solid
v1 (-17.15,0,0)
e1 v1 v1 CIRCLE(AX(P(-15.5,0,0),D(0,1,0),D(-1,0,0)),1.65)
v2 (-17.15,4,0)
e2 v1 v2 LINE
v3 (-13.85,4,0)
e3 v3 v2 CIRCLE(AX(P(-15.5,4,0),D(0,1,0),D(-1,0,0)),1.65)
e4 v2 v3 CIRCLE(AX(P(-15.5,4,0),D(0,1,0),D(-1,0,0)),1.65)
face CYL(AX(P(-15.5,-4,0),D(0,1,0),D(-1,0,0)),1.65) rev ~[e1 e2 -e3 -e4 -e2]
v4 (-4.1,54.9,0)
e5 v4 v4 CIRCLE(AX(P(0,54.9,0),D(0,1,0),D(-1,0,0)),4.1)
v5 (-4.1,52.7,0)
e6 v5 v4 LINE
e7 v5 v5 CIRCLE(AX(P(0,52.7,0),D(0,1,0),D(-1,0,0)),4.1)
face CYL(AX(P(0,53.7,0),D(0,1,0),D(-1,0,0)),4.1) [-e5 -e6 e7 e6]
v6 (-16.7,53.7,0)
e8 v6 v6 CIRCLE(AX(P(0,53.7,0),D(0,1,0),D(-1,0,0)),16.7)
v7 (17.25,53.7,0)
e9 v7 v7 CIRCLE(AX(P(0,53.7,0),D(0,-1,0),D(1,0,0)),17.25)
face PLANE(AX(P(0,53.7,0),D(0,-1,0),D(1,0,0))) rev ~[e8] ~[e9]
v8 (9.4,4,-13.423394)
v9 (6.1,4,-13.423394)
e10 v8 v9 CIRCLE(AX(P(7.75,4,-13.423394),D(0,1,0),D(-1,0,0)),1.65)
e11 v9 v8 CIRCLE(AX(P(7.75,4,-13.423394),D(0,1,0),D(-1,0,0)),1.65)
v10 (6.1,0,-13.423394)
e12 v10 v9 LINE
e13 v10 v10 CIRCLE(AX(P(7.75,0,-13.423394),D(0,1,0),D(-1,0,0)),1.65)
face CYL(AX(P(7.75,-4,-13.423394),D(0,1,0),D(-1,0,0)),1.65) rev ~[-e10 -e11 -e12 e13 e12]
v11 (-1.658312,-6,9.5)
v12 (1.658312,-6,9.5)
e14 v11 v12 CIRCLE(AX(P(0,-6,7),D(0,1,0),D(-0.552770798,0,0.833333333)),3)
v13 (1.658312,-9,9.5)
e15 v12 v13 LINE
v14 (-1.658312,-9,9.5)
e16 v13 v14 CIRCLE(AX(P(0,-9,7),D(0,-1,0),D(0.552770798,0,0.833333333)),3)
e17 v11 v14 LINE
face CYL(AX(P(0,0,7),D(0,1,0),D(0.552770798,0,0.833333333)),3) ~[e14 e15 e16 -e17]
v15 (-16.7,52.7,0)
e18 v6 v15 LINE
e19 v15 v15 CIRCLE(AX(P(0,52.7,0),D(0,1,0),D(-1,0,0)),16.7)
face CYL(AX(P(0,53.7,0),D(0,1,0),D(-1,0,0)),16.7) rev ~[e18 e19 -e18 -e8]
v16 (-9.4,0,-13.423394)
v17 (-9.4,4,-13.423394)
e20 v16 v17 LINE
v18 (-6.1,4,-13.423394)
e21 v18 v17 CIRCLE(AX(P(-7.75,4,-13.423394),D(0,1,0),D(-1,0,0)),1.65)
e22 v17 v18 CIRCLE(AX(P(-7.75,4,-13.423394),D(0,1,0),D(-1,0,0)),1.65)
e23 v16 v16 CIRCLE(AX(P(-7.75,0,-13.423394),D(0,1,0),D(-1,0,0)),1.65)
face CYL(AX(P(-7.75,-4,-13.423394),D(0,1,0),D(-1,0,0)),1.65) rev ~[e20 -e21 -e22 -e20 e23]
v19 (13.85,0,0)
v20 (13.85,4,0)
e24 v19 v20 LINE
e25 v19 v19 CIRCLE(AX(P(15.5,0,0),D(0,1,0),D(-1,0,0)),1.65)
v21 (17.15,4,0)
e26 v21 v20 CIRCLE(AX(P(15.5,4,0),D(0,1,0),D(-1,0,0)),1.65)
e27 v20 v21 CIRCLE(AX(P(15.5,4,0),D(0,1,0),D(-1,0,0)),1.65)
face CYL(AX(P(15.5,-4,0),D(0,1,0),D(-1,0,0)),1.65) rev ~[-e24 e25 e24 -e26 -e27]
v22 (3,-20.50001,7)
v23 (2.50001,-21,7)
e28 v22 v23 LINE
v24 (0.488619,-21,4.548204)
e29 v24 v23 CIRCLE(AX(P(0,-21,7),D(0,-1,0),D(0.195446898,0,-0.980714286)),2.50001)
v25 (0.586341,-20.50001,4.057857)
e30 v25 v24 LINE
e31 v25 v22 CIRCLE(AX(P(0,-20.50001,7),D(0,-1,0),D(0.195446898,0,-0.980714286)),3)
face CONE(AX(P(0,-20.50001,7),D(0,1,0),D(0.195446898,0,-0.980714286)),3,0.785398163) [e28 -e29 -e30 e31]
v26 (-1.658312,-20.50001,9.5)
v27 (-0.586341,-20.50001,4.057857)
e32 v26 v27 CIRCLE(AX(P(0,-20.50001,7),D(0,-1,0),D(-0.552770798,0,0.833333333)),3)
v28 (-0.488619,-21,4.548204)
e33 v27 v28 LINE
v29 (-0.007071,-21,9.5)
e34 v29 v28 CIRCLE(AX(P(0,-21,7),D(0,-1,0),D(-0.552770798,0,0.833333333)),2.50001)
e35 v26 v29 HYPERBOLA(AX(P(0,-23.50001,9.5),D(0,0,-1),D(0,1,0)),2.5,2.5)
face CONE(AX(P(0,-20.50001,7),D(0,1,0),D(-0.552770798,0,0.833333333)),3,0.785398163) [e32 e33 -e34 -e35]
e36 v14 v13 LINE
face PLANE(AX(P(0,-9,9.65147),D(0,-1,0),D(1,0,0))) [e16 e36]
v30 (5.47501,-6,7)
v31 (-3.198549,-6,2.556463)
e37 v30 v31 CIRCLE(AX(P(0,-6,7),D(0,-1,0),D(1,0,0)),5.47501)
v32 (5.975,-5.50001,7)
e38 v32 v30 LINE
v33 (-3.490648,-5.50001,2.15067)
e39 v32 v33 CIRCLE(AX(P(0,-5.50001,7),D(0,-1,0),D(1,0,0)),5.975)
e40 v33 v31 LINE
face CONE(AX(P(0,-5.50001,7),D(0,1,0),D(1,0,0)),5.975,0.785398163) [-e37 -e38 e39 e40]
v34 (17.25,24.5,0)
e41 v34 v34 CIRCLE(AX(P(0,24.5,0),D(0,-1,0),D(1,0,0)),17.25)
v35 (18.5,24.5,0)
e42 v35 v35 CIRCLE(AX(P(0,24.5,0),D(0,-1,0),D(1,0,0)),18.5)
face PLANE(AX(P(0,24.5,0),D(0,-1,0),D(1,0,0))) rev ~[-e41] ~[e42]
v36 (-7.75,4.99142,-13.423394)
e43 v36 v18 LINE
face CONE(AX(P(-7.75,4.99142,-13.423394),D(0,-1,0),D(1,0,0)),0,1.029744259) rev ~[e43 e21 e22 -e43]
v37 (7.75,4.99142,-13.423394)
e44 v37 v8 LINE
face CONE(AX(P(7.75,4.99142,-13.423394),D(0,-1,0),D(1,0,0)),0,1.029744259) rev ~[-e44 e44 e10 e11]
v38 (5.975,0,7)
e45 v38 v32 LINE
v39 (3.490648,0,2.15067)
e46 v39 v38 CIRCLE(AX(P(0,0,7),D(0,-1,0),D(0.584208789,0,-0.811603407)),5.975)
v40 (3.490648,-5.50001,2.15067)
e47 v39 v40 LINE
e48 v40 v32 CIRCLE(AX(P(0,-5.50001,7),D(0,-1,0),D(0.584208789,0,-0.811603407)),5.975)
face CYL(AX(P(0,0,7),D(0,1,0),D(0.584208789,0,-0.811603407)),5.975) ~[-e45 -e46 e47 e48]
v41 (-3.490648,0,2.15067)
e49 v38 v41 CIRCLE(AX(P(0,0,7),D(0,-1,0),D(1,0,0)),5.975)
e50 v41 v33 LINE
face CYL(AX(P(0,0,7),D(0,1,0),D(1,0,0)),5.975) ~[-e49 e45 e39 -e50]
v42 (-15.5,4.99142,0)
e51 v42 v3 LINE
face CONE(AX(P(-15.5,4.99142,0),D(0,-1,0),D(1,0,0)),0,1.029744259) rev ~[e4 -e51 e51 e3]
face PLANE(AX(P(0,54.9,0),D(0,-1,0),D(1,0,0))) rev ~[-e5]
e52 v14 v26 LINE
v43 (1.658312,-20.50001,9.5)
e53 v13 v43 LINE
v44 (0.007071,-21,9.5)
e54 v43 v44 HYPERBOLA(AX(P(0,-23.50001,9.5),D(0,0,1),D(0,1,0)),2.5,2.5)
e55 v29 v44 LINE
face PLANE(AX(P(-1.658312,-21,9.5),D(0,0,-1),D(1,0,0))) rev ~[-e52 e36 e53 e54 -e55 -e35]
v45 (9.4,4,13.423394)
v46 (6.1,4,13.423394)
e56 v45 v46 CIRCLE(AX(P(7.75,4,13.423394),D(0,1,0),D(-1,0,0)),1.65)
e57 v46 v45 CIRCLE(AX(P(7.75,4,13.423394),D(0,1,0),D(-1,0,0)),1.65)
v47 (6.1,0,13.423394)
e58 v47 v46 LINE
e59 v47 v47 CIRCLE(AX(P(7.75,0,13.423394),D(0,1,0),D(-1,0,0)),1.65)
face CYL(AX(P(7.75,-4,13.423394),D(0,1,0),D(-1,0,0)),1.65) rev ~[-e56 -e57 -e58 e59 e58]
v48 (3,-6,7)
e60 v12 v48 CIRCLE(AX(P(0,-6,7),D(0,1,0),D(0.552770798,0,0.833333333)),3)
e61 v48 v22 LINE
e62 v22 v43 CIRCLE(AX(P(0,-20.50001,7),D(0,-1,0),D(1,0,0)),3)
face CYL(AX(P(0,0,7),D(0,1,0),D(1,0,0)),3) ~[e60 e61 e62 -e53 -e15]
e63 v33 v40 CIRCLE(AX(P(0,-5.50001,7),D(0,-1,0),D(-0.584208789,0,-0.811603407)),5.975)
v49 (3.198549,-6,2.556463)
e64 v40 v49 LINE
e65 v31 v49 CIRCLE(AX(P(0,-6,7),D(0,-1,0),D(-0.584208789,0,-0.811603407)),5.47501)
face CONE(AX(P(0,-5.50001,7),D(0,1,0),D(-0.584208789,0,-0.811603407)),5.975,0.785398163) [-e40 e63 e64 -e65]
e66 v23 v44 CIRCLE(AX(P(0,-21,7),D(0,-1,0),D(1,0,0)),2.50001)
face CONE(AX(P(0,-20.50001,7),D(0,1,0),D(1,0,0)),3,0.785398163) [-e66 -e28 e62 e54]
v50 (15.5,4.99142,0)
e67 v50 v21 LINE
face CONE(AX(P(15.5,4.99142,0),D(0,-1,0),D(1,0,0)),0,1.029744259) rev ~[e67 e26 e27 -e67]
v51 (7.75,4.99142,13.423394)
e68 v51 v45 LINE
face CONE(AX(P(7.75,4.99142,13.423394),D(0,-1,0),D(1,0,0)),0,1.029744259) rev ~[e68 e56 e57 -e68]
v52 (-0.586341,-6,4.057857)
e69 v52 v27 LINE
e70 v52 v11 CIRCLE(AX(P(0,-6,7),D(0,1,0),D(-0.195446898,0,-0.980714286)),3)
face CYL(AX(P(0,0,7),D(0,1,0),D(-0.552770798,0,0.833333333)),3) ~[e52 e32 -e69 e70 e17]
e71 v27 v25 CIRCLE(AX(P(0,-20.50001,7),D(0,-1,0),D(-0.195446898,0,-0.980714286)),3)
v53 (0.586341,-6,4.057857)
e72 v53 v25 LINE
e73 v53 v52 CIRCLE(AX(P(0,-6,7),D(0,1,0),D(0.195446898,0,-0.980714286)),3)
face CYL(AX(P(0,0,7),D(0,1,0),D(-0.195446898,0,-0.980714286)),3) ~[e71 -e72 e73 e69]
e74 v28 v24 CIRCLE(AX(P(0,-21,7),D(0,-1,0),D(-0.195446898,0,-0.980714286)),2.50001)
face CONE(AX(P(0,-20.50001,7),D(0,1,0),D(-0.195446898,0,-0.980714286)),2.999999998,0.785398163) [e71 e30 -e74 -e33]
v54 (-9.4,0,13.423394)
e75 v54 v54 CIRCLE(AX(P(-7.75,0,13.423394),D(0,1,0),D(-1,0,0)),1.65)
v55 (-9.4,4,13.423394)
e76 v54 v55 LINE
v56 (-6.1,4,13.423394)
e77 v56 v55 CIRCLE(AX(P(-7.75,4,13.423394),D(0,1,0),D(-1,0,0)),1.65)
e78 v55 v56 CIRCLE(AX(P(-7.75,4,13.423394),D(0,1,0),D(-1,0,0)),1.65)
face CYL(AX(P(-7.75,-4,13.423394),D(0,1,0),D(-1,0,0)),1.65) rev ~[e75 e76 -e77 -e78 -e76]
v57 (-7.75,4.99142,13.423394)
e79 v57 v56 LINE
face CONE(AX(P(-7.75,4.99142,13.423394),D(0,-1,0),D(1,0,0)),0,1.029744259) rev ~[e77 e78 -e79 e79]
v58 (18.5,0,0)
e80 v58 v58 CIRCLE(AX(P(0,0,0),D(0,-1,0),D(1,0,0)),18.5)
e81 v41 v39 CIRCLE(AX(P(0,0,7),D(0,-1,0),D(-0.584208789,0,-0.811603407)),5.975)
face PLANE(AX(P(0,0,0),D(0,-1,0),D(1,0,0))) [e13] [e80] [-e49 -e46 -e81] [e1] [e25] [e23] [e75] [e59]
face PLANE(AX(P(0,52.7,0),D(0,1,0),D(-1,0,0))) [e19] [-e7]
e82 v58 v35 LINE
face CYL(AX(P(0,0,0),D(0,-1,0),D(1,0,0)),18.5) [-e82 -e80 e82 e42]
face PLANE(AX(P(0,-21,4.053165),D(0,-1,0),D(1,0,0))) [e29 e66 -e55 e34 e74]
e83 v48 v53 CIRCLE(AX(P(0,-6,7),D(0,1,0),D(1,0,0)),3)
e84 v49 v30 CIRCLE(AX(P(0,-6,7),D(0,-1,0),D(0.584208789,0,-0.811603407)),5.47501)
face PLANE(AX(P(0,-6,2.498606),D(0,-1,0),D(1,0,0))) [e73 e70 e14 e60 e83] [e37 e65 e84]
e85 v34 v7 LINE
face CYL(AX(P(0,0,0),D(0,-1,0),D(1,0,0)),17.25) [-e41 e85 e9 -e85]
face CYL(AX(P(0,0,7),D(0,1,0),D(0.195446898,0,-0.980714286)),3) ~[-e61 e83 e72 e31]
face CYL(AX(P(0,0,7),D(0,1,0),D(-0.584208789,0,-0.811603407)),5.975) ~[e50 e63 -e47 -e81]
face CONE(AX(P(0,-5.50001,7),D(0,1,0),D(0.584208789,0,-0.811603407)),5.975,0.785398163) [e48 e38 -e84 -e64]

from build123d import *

# Parameters (mm, degrees)
F0_R      = 18.5
F0_R_2    = 17.25
F0_R_3    = 16.7
F0_R_4    = 4.1
F1_DEPTH  = 24.5
F2_DEPTH  = 53.7
F3_R      = 16.7
F3_R_2    = 4.1
F4_DEPTH  = 1
F5_DEPTH  = 1.2
F7_D      = 3.3
F7_DEPTH  = 4
F7_TIP    = 0.9914200214
F8_DEPTH  = 21
F9_DEPTH  = 6
F11_DEPTH = 12
F13_SIZE  = 0.49999


# Not quite as in the source:
# - a fillet or chamfer is up to 0.001 mm smaller than in the source, because OpenCascade refuses the exact size
# - a feature of the source that left no trace in its solid (it failed there, or was rolled back) is left out
# - a feature names something its author has since deleted; it is built from what else it names


with BuildPart() as f1:
    # F0 (on Front) → F1 (new body)
    with BuildSketch(Plane.XZ):
        Circle(F0_R)
        Circle(F0_R_2, mode=Mode.SUBTRACT)
        Circle(F0_R_2)
        Circle(F0_R_3, mode=Mode.SUBTRACT)
        Circle(F0_R_3)
        Circle(F0_R_4, mode=Mode.SUBTRACT)
        Circle(F0_R_4)
    extrude(amount=-F1_DEPTH)

    # F0 (on Front) → F2 (join)
    with BuildSketch(Plane.XZ):
        Circle(F0_R_2)
        Circle(F0_R_3, mode=Mode.SUBTRACT)
        Circle(F0_R_3)
        Circle(F0_R_4, mode=Mode.SUBTRACT)
        Circle(F0_R_4)
    extrude(amount=-F2_DEPTH)

    # F3 (on face) → F4 (cut)
    with BuildSketch(Plane(origin=(0, 53.7, 0), x_dir=(-1, 0, 0), z_dir=(0, 1, 0))):
        Circle(F3_R)
        Circle(F3_R_2, mode=Mode.SUBTRACT)
    extrude(amount=-F4_DEPTH, mode=Mode.SUBTRACT)

    # F5 (add): a face of the model
    f5_faces = [f1.faces().sort_by_distance(p)[0] for p in [
        (0, 53.7, 0),
    ]]
    extrude(f5_faces, amount=F5_DEPTH)

    # F7
    with Locations(Plane.XZ):
        with Locations((7.75, 13.4233937587), (15.5, 0), (7.75, -13.4233937587), (-7.75, -13.4233937587), (-15.5, 0), (-7.75, 13.4233937587)):
            Hole(F7_D / 2, depth=F7_DEPTH)
            with Locations((0, 0, -(F7_DEPTH + F7_TIP / 2))):  # 118° drill point
                Cone(0, F7_D / 2, F7_TIP, mode=Mode.SUBTRACT)

    # F6 (on face) → F8 (join)
    with BuildSketch(Plane.XZ):
        with BuildLine():
            ThreePointArc((0.5863406929, 4.0578571429), (0, 4.1), (-0.5863406929, 4.0578571429))
            ThreePointArc((-0.5863406929, 4.0578571429), (0, 4), (0.5863406929, 4.0578571429))
        make_face()
        with BuildLine():
            ThreePointArc((-1.6583123952, 9.5), (-2.9434412837, 6.4202126173), (-0.5863406929, 4.0578571429))
            ThreePointArc((-0.5863406929, 4.0578571429), (0, 4.1), (0.5863406929, 4.0578571429))
            ThreePointArc((0.5863406929, 4.0578571429), (2.3193772956, 5.0972417493), (3, 7))
            ThreePointArc((3, 7), (2.6433820369, 8.4186371655), (1.6583123952, 9.5))
            Line((1.6583123952, 9.5), (-1.6583123952, 9.5))
        make_face()
        with BuildLine():
            ThreePointArc((1.6583123952, 9.5), (0, 10), (-1.6583123952, 9.5))
            Line((-1.6583123952, 9.5), (1.6583123952, 9.5))
        make_face()
    extrude(amount=F8_DEPTH)

    # F6 (on face) → F9 (join)
    with BuildSketch(Plane.XZ):
        with BuildLine():
            ThreePointArc((-0.5863406929, 4.0578571429), (-2.2505108877, 3.4271271853), (-3.4906475169, 2.1506696429))
            ThreePointArc((-3.4906475169, 2.1506696429), (0, 1.025), (3.4906475169, 2.1506696429))
            ThreePointArc((3.4906475169, 2.1506696429), (2.2505108877, 3.4271271853), (0.5863406929, 4.0578571429))
            ThreePointArc((0.5863406929, 4.0578571429), (0, 4), (-0.5863406929, 4.0578571429))
        make_face()
        with BuildLine():
            ThreePointArc((3.4906475169, 2.1506696429), (5.3177647519, 4.2756646603), (5.975, 7))
            ThreePointArc((5.975, 7), (-2.7243353397, 12.3177647519), (-3.4906475169, 2.1506696429))
            ThreePointArc((-3.4906475169, 2.1506696429), (-2.2505108877, 3.4271271853), (-0.5863406929, 4.0578571429))
            ThreePointArc((-0.5863406929, 4.0578571429), (-2.9434412837, 6.4202126173), (-1.6583123952, 9.5))
            ThreePointArc((-1.6583123952, 9.5), (0, 10), (1.6583123952, 9.5))
            ThreePointArc((1.6583123952, 9.5), (2.6433820369, 8.4186371655), (3, 7))
            ThreePointArc((3, 7), (2.3193772956, 5.0972417493), (0.5863406929, 4.0578571429))
            ThreePointArc((0.5863406929, 4.0578571429), (2.2505108877, 3.4271271853), (3.4906475169, 2.1506696429))
        make_face()
    extrude(amount=F9_DEPTH)

    # F10 (on face) → F11 (cut)
    with BuildSketch(Plane.XZ.offset(21)):
        with BuildLine():
            ThreePointArc((1.6583123952, 9.5), (0, 10), (-1.6583123952, 9.5))
            Line((-1.6583123952, 9.5), (1.6583123952, 9.5))
        make_face()
    extrude(amount=-F11_DEPTH, mode=Mode.SUBTRACT)

    # F13 (size 0.5 in the source; OpenCascade refuses exactly that, so slightly less here)
    f13_edges = [f1.edges().sort_by_distance(p)[0] for p in [
        (-3.490648, -6, 11.84933),
        (0, -21, 4),
    ]]
    chamfer(f13_edges, length=F13_SIZE)


solid = f1.part
